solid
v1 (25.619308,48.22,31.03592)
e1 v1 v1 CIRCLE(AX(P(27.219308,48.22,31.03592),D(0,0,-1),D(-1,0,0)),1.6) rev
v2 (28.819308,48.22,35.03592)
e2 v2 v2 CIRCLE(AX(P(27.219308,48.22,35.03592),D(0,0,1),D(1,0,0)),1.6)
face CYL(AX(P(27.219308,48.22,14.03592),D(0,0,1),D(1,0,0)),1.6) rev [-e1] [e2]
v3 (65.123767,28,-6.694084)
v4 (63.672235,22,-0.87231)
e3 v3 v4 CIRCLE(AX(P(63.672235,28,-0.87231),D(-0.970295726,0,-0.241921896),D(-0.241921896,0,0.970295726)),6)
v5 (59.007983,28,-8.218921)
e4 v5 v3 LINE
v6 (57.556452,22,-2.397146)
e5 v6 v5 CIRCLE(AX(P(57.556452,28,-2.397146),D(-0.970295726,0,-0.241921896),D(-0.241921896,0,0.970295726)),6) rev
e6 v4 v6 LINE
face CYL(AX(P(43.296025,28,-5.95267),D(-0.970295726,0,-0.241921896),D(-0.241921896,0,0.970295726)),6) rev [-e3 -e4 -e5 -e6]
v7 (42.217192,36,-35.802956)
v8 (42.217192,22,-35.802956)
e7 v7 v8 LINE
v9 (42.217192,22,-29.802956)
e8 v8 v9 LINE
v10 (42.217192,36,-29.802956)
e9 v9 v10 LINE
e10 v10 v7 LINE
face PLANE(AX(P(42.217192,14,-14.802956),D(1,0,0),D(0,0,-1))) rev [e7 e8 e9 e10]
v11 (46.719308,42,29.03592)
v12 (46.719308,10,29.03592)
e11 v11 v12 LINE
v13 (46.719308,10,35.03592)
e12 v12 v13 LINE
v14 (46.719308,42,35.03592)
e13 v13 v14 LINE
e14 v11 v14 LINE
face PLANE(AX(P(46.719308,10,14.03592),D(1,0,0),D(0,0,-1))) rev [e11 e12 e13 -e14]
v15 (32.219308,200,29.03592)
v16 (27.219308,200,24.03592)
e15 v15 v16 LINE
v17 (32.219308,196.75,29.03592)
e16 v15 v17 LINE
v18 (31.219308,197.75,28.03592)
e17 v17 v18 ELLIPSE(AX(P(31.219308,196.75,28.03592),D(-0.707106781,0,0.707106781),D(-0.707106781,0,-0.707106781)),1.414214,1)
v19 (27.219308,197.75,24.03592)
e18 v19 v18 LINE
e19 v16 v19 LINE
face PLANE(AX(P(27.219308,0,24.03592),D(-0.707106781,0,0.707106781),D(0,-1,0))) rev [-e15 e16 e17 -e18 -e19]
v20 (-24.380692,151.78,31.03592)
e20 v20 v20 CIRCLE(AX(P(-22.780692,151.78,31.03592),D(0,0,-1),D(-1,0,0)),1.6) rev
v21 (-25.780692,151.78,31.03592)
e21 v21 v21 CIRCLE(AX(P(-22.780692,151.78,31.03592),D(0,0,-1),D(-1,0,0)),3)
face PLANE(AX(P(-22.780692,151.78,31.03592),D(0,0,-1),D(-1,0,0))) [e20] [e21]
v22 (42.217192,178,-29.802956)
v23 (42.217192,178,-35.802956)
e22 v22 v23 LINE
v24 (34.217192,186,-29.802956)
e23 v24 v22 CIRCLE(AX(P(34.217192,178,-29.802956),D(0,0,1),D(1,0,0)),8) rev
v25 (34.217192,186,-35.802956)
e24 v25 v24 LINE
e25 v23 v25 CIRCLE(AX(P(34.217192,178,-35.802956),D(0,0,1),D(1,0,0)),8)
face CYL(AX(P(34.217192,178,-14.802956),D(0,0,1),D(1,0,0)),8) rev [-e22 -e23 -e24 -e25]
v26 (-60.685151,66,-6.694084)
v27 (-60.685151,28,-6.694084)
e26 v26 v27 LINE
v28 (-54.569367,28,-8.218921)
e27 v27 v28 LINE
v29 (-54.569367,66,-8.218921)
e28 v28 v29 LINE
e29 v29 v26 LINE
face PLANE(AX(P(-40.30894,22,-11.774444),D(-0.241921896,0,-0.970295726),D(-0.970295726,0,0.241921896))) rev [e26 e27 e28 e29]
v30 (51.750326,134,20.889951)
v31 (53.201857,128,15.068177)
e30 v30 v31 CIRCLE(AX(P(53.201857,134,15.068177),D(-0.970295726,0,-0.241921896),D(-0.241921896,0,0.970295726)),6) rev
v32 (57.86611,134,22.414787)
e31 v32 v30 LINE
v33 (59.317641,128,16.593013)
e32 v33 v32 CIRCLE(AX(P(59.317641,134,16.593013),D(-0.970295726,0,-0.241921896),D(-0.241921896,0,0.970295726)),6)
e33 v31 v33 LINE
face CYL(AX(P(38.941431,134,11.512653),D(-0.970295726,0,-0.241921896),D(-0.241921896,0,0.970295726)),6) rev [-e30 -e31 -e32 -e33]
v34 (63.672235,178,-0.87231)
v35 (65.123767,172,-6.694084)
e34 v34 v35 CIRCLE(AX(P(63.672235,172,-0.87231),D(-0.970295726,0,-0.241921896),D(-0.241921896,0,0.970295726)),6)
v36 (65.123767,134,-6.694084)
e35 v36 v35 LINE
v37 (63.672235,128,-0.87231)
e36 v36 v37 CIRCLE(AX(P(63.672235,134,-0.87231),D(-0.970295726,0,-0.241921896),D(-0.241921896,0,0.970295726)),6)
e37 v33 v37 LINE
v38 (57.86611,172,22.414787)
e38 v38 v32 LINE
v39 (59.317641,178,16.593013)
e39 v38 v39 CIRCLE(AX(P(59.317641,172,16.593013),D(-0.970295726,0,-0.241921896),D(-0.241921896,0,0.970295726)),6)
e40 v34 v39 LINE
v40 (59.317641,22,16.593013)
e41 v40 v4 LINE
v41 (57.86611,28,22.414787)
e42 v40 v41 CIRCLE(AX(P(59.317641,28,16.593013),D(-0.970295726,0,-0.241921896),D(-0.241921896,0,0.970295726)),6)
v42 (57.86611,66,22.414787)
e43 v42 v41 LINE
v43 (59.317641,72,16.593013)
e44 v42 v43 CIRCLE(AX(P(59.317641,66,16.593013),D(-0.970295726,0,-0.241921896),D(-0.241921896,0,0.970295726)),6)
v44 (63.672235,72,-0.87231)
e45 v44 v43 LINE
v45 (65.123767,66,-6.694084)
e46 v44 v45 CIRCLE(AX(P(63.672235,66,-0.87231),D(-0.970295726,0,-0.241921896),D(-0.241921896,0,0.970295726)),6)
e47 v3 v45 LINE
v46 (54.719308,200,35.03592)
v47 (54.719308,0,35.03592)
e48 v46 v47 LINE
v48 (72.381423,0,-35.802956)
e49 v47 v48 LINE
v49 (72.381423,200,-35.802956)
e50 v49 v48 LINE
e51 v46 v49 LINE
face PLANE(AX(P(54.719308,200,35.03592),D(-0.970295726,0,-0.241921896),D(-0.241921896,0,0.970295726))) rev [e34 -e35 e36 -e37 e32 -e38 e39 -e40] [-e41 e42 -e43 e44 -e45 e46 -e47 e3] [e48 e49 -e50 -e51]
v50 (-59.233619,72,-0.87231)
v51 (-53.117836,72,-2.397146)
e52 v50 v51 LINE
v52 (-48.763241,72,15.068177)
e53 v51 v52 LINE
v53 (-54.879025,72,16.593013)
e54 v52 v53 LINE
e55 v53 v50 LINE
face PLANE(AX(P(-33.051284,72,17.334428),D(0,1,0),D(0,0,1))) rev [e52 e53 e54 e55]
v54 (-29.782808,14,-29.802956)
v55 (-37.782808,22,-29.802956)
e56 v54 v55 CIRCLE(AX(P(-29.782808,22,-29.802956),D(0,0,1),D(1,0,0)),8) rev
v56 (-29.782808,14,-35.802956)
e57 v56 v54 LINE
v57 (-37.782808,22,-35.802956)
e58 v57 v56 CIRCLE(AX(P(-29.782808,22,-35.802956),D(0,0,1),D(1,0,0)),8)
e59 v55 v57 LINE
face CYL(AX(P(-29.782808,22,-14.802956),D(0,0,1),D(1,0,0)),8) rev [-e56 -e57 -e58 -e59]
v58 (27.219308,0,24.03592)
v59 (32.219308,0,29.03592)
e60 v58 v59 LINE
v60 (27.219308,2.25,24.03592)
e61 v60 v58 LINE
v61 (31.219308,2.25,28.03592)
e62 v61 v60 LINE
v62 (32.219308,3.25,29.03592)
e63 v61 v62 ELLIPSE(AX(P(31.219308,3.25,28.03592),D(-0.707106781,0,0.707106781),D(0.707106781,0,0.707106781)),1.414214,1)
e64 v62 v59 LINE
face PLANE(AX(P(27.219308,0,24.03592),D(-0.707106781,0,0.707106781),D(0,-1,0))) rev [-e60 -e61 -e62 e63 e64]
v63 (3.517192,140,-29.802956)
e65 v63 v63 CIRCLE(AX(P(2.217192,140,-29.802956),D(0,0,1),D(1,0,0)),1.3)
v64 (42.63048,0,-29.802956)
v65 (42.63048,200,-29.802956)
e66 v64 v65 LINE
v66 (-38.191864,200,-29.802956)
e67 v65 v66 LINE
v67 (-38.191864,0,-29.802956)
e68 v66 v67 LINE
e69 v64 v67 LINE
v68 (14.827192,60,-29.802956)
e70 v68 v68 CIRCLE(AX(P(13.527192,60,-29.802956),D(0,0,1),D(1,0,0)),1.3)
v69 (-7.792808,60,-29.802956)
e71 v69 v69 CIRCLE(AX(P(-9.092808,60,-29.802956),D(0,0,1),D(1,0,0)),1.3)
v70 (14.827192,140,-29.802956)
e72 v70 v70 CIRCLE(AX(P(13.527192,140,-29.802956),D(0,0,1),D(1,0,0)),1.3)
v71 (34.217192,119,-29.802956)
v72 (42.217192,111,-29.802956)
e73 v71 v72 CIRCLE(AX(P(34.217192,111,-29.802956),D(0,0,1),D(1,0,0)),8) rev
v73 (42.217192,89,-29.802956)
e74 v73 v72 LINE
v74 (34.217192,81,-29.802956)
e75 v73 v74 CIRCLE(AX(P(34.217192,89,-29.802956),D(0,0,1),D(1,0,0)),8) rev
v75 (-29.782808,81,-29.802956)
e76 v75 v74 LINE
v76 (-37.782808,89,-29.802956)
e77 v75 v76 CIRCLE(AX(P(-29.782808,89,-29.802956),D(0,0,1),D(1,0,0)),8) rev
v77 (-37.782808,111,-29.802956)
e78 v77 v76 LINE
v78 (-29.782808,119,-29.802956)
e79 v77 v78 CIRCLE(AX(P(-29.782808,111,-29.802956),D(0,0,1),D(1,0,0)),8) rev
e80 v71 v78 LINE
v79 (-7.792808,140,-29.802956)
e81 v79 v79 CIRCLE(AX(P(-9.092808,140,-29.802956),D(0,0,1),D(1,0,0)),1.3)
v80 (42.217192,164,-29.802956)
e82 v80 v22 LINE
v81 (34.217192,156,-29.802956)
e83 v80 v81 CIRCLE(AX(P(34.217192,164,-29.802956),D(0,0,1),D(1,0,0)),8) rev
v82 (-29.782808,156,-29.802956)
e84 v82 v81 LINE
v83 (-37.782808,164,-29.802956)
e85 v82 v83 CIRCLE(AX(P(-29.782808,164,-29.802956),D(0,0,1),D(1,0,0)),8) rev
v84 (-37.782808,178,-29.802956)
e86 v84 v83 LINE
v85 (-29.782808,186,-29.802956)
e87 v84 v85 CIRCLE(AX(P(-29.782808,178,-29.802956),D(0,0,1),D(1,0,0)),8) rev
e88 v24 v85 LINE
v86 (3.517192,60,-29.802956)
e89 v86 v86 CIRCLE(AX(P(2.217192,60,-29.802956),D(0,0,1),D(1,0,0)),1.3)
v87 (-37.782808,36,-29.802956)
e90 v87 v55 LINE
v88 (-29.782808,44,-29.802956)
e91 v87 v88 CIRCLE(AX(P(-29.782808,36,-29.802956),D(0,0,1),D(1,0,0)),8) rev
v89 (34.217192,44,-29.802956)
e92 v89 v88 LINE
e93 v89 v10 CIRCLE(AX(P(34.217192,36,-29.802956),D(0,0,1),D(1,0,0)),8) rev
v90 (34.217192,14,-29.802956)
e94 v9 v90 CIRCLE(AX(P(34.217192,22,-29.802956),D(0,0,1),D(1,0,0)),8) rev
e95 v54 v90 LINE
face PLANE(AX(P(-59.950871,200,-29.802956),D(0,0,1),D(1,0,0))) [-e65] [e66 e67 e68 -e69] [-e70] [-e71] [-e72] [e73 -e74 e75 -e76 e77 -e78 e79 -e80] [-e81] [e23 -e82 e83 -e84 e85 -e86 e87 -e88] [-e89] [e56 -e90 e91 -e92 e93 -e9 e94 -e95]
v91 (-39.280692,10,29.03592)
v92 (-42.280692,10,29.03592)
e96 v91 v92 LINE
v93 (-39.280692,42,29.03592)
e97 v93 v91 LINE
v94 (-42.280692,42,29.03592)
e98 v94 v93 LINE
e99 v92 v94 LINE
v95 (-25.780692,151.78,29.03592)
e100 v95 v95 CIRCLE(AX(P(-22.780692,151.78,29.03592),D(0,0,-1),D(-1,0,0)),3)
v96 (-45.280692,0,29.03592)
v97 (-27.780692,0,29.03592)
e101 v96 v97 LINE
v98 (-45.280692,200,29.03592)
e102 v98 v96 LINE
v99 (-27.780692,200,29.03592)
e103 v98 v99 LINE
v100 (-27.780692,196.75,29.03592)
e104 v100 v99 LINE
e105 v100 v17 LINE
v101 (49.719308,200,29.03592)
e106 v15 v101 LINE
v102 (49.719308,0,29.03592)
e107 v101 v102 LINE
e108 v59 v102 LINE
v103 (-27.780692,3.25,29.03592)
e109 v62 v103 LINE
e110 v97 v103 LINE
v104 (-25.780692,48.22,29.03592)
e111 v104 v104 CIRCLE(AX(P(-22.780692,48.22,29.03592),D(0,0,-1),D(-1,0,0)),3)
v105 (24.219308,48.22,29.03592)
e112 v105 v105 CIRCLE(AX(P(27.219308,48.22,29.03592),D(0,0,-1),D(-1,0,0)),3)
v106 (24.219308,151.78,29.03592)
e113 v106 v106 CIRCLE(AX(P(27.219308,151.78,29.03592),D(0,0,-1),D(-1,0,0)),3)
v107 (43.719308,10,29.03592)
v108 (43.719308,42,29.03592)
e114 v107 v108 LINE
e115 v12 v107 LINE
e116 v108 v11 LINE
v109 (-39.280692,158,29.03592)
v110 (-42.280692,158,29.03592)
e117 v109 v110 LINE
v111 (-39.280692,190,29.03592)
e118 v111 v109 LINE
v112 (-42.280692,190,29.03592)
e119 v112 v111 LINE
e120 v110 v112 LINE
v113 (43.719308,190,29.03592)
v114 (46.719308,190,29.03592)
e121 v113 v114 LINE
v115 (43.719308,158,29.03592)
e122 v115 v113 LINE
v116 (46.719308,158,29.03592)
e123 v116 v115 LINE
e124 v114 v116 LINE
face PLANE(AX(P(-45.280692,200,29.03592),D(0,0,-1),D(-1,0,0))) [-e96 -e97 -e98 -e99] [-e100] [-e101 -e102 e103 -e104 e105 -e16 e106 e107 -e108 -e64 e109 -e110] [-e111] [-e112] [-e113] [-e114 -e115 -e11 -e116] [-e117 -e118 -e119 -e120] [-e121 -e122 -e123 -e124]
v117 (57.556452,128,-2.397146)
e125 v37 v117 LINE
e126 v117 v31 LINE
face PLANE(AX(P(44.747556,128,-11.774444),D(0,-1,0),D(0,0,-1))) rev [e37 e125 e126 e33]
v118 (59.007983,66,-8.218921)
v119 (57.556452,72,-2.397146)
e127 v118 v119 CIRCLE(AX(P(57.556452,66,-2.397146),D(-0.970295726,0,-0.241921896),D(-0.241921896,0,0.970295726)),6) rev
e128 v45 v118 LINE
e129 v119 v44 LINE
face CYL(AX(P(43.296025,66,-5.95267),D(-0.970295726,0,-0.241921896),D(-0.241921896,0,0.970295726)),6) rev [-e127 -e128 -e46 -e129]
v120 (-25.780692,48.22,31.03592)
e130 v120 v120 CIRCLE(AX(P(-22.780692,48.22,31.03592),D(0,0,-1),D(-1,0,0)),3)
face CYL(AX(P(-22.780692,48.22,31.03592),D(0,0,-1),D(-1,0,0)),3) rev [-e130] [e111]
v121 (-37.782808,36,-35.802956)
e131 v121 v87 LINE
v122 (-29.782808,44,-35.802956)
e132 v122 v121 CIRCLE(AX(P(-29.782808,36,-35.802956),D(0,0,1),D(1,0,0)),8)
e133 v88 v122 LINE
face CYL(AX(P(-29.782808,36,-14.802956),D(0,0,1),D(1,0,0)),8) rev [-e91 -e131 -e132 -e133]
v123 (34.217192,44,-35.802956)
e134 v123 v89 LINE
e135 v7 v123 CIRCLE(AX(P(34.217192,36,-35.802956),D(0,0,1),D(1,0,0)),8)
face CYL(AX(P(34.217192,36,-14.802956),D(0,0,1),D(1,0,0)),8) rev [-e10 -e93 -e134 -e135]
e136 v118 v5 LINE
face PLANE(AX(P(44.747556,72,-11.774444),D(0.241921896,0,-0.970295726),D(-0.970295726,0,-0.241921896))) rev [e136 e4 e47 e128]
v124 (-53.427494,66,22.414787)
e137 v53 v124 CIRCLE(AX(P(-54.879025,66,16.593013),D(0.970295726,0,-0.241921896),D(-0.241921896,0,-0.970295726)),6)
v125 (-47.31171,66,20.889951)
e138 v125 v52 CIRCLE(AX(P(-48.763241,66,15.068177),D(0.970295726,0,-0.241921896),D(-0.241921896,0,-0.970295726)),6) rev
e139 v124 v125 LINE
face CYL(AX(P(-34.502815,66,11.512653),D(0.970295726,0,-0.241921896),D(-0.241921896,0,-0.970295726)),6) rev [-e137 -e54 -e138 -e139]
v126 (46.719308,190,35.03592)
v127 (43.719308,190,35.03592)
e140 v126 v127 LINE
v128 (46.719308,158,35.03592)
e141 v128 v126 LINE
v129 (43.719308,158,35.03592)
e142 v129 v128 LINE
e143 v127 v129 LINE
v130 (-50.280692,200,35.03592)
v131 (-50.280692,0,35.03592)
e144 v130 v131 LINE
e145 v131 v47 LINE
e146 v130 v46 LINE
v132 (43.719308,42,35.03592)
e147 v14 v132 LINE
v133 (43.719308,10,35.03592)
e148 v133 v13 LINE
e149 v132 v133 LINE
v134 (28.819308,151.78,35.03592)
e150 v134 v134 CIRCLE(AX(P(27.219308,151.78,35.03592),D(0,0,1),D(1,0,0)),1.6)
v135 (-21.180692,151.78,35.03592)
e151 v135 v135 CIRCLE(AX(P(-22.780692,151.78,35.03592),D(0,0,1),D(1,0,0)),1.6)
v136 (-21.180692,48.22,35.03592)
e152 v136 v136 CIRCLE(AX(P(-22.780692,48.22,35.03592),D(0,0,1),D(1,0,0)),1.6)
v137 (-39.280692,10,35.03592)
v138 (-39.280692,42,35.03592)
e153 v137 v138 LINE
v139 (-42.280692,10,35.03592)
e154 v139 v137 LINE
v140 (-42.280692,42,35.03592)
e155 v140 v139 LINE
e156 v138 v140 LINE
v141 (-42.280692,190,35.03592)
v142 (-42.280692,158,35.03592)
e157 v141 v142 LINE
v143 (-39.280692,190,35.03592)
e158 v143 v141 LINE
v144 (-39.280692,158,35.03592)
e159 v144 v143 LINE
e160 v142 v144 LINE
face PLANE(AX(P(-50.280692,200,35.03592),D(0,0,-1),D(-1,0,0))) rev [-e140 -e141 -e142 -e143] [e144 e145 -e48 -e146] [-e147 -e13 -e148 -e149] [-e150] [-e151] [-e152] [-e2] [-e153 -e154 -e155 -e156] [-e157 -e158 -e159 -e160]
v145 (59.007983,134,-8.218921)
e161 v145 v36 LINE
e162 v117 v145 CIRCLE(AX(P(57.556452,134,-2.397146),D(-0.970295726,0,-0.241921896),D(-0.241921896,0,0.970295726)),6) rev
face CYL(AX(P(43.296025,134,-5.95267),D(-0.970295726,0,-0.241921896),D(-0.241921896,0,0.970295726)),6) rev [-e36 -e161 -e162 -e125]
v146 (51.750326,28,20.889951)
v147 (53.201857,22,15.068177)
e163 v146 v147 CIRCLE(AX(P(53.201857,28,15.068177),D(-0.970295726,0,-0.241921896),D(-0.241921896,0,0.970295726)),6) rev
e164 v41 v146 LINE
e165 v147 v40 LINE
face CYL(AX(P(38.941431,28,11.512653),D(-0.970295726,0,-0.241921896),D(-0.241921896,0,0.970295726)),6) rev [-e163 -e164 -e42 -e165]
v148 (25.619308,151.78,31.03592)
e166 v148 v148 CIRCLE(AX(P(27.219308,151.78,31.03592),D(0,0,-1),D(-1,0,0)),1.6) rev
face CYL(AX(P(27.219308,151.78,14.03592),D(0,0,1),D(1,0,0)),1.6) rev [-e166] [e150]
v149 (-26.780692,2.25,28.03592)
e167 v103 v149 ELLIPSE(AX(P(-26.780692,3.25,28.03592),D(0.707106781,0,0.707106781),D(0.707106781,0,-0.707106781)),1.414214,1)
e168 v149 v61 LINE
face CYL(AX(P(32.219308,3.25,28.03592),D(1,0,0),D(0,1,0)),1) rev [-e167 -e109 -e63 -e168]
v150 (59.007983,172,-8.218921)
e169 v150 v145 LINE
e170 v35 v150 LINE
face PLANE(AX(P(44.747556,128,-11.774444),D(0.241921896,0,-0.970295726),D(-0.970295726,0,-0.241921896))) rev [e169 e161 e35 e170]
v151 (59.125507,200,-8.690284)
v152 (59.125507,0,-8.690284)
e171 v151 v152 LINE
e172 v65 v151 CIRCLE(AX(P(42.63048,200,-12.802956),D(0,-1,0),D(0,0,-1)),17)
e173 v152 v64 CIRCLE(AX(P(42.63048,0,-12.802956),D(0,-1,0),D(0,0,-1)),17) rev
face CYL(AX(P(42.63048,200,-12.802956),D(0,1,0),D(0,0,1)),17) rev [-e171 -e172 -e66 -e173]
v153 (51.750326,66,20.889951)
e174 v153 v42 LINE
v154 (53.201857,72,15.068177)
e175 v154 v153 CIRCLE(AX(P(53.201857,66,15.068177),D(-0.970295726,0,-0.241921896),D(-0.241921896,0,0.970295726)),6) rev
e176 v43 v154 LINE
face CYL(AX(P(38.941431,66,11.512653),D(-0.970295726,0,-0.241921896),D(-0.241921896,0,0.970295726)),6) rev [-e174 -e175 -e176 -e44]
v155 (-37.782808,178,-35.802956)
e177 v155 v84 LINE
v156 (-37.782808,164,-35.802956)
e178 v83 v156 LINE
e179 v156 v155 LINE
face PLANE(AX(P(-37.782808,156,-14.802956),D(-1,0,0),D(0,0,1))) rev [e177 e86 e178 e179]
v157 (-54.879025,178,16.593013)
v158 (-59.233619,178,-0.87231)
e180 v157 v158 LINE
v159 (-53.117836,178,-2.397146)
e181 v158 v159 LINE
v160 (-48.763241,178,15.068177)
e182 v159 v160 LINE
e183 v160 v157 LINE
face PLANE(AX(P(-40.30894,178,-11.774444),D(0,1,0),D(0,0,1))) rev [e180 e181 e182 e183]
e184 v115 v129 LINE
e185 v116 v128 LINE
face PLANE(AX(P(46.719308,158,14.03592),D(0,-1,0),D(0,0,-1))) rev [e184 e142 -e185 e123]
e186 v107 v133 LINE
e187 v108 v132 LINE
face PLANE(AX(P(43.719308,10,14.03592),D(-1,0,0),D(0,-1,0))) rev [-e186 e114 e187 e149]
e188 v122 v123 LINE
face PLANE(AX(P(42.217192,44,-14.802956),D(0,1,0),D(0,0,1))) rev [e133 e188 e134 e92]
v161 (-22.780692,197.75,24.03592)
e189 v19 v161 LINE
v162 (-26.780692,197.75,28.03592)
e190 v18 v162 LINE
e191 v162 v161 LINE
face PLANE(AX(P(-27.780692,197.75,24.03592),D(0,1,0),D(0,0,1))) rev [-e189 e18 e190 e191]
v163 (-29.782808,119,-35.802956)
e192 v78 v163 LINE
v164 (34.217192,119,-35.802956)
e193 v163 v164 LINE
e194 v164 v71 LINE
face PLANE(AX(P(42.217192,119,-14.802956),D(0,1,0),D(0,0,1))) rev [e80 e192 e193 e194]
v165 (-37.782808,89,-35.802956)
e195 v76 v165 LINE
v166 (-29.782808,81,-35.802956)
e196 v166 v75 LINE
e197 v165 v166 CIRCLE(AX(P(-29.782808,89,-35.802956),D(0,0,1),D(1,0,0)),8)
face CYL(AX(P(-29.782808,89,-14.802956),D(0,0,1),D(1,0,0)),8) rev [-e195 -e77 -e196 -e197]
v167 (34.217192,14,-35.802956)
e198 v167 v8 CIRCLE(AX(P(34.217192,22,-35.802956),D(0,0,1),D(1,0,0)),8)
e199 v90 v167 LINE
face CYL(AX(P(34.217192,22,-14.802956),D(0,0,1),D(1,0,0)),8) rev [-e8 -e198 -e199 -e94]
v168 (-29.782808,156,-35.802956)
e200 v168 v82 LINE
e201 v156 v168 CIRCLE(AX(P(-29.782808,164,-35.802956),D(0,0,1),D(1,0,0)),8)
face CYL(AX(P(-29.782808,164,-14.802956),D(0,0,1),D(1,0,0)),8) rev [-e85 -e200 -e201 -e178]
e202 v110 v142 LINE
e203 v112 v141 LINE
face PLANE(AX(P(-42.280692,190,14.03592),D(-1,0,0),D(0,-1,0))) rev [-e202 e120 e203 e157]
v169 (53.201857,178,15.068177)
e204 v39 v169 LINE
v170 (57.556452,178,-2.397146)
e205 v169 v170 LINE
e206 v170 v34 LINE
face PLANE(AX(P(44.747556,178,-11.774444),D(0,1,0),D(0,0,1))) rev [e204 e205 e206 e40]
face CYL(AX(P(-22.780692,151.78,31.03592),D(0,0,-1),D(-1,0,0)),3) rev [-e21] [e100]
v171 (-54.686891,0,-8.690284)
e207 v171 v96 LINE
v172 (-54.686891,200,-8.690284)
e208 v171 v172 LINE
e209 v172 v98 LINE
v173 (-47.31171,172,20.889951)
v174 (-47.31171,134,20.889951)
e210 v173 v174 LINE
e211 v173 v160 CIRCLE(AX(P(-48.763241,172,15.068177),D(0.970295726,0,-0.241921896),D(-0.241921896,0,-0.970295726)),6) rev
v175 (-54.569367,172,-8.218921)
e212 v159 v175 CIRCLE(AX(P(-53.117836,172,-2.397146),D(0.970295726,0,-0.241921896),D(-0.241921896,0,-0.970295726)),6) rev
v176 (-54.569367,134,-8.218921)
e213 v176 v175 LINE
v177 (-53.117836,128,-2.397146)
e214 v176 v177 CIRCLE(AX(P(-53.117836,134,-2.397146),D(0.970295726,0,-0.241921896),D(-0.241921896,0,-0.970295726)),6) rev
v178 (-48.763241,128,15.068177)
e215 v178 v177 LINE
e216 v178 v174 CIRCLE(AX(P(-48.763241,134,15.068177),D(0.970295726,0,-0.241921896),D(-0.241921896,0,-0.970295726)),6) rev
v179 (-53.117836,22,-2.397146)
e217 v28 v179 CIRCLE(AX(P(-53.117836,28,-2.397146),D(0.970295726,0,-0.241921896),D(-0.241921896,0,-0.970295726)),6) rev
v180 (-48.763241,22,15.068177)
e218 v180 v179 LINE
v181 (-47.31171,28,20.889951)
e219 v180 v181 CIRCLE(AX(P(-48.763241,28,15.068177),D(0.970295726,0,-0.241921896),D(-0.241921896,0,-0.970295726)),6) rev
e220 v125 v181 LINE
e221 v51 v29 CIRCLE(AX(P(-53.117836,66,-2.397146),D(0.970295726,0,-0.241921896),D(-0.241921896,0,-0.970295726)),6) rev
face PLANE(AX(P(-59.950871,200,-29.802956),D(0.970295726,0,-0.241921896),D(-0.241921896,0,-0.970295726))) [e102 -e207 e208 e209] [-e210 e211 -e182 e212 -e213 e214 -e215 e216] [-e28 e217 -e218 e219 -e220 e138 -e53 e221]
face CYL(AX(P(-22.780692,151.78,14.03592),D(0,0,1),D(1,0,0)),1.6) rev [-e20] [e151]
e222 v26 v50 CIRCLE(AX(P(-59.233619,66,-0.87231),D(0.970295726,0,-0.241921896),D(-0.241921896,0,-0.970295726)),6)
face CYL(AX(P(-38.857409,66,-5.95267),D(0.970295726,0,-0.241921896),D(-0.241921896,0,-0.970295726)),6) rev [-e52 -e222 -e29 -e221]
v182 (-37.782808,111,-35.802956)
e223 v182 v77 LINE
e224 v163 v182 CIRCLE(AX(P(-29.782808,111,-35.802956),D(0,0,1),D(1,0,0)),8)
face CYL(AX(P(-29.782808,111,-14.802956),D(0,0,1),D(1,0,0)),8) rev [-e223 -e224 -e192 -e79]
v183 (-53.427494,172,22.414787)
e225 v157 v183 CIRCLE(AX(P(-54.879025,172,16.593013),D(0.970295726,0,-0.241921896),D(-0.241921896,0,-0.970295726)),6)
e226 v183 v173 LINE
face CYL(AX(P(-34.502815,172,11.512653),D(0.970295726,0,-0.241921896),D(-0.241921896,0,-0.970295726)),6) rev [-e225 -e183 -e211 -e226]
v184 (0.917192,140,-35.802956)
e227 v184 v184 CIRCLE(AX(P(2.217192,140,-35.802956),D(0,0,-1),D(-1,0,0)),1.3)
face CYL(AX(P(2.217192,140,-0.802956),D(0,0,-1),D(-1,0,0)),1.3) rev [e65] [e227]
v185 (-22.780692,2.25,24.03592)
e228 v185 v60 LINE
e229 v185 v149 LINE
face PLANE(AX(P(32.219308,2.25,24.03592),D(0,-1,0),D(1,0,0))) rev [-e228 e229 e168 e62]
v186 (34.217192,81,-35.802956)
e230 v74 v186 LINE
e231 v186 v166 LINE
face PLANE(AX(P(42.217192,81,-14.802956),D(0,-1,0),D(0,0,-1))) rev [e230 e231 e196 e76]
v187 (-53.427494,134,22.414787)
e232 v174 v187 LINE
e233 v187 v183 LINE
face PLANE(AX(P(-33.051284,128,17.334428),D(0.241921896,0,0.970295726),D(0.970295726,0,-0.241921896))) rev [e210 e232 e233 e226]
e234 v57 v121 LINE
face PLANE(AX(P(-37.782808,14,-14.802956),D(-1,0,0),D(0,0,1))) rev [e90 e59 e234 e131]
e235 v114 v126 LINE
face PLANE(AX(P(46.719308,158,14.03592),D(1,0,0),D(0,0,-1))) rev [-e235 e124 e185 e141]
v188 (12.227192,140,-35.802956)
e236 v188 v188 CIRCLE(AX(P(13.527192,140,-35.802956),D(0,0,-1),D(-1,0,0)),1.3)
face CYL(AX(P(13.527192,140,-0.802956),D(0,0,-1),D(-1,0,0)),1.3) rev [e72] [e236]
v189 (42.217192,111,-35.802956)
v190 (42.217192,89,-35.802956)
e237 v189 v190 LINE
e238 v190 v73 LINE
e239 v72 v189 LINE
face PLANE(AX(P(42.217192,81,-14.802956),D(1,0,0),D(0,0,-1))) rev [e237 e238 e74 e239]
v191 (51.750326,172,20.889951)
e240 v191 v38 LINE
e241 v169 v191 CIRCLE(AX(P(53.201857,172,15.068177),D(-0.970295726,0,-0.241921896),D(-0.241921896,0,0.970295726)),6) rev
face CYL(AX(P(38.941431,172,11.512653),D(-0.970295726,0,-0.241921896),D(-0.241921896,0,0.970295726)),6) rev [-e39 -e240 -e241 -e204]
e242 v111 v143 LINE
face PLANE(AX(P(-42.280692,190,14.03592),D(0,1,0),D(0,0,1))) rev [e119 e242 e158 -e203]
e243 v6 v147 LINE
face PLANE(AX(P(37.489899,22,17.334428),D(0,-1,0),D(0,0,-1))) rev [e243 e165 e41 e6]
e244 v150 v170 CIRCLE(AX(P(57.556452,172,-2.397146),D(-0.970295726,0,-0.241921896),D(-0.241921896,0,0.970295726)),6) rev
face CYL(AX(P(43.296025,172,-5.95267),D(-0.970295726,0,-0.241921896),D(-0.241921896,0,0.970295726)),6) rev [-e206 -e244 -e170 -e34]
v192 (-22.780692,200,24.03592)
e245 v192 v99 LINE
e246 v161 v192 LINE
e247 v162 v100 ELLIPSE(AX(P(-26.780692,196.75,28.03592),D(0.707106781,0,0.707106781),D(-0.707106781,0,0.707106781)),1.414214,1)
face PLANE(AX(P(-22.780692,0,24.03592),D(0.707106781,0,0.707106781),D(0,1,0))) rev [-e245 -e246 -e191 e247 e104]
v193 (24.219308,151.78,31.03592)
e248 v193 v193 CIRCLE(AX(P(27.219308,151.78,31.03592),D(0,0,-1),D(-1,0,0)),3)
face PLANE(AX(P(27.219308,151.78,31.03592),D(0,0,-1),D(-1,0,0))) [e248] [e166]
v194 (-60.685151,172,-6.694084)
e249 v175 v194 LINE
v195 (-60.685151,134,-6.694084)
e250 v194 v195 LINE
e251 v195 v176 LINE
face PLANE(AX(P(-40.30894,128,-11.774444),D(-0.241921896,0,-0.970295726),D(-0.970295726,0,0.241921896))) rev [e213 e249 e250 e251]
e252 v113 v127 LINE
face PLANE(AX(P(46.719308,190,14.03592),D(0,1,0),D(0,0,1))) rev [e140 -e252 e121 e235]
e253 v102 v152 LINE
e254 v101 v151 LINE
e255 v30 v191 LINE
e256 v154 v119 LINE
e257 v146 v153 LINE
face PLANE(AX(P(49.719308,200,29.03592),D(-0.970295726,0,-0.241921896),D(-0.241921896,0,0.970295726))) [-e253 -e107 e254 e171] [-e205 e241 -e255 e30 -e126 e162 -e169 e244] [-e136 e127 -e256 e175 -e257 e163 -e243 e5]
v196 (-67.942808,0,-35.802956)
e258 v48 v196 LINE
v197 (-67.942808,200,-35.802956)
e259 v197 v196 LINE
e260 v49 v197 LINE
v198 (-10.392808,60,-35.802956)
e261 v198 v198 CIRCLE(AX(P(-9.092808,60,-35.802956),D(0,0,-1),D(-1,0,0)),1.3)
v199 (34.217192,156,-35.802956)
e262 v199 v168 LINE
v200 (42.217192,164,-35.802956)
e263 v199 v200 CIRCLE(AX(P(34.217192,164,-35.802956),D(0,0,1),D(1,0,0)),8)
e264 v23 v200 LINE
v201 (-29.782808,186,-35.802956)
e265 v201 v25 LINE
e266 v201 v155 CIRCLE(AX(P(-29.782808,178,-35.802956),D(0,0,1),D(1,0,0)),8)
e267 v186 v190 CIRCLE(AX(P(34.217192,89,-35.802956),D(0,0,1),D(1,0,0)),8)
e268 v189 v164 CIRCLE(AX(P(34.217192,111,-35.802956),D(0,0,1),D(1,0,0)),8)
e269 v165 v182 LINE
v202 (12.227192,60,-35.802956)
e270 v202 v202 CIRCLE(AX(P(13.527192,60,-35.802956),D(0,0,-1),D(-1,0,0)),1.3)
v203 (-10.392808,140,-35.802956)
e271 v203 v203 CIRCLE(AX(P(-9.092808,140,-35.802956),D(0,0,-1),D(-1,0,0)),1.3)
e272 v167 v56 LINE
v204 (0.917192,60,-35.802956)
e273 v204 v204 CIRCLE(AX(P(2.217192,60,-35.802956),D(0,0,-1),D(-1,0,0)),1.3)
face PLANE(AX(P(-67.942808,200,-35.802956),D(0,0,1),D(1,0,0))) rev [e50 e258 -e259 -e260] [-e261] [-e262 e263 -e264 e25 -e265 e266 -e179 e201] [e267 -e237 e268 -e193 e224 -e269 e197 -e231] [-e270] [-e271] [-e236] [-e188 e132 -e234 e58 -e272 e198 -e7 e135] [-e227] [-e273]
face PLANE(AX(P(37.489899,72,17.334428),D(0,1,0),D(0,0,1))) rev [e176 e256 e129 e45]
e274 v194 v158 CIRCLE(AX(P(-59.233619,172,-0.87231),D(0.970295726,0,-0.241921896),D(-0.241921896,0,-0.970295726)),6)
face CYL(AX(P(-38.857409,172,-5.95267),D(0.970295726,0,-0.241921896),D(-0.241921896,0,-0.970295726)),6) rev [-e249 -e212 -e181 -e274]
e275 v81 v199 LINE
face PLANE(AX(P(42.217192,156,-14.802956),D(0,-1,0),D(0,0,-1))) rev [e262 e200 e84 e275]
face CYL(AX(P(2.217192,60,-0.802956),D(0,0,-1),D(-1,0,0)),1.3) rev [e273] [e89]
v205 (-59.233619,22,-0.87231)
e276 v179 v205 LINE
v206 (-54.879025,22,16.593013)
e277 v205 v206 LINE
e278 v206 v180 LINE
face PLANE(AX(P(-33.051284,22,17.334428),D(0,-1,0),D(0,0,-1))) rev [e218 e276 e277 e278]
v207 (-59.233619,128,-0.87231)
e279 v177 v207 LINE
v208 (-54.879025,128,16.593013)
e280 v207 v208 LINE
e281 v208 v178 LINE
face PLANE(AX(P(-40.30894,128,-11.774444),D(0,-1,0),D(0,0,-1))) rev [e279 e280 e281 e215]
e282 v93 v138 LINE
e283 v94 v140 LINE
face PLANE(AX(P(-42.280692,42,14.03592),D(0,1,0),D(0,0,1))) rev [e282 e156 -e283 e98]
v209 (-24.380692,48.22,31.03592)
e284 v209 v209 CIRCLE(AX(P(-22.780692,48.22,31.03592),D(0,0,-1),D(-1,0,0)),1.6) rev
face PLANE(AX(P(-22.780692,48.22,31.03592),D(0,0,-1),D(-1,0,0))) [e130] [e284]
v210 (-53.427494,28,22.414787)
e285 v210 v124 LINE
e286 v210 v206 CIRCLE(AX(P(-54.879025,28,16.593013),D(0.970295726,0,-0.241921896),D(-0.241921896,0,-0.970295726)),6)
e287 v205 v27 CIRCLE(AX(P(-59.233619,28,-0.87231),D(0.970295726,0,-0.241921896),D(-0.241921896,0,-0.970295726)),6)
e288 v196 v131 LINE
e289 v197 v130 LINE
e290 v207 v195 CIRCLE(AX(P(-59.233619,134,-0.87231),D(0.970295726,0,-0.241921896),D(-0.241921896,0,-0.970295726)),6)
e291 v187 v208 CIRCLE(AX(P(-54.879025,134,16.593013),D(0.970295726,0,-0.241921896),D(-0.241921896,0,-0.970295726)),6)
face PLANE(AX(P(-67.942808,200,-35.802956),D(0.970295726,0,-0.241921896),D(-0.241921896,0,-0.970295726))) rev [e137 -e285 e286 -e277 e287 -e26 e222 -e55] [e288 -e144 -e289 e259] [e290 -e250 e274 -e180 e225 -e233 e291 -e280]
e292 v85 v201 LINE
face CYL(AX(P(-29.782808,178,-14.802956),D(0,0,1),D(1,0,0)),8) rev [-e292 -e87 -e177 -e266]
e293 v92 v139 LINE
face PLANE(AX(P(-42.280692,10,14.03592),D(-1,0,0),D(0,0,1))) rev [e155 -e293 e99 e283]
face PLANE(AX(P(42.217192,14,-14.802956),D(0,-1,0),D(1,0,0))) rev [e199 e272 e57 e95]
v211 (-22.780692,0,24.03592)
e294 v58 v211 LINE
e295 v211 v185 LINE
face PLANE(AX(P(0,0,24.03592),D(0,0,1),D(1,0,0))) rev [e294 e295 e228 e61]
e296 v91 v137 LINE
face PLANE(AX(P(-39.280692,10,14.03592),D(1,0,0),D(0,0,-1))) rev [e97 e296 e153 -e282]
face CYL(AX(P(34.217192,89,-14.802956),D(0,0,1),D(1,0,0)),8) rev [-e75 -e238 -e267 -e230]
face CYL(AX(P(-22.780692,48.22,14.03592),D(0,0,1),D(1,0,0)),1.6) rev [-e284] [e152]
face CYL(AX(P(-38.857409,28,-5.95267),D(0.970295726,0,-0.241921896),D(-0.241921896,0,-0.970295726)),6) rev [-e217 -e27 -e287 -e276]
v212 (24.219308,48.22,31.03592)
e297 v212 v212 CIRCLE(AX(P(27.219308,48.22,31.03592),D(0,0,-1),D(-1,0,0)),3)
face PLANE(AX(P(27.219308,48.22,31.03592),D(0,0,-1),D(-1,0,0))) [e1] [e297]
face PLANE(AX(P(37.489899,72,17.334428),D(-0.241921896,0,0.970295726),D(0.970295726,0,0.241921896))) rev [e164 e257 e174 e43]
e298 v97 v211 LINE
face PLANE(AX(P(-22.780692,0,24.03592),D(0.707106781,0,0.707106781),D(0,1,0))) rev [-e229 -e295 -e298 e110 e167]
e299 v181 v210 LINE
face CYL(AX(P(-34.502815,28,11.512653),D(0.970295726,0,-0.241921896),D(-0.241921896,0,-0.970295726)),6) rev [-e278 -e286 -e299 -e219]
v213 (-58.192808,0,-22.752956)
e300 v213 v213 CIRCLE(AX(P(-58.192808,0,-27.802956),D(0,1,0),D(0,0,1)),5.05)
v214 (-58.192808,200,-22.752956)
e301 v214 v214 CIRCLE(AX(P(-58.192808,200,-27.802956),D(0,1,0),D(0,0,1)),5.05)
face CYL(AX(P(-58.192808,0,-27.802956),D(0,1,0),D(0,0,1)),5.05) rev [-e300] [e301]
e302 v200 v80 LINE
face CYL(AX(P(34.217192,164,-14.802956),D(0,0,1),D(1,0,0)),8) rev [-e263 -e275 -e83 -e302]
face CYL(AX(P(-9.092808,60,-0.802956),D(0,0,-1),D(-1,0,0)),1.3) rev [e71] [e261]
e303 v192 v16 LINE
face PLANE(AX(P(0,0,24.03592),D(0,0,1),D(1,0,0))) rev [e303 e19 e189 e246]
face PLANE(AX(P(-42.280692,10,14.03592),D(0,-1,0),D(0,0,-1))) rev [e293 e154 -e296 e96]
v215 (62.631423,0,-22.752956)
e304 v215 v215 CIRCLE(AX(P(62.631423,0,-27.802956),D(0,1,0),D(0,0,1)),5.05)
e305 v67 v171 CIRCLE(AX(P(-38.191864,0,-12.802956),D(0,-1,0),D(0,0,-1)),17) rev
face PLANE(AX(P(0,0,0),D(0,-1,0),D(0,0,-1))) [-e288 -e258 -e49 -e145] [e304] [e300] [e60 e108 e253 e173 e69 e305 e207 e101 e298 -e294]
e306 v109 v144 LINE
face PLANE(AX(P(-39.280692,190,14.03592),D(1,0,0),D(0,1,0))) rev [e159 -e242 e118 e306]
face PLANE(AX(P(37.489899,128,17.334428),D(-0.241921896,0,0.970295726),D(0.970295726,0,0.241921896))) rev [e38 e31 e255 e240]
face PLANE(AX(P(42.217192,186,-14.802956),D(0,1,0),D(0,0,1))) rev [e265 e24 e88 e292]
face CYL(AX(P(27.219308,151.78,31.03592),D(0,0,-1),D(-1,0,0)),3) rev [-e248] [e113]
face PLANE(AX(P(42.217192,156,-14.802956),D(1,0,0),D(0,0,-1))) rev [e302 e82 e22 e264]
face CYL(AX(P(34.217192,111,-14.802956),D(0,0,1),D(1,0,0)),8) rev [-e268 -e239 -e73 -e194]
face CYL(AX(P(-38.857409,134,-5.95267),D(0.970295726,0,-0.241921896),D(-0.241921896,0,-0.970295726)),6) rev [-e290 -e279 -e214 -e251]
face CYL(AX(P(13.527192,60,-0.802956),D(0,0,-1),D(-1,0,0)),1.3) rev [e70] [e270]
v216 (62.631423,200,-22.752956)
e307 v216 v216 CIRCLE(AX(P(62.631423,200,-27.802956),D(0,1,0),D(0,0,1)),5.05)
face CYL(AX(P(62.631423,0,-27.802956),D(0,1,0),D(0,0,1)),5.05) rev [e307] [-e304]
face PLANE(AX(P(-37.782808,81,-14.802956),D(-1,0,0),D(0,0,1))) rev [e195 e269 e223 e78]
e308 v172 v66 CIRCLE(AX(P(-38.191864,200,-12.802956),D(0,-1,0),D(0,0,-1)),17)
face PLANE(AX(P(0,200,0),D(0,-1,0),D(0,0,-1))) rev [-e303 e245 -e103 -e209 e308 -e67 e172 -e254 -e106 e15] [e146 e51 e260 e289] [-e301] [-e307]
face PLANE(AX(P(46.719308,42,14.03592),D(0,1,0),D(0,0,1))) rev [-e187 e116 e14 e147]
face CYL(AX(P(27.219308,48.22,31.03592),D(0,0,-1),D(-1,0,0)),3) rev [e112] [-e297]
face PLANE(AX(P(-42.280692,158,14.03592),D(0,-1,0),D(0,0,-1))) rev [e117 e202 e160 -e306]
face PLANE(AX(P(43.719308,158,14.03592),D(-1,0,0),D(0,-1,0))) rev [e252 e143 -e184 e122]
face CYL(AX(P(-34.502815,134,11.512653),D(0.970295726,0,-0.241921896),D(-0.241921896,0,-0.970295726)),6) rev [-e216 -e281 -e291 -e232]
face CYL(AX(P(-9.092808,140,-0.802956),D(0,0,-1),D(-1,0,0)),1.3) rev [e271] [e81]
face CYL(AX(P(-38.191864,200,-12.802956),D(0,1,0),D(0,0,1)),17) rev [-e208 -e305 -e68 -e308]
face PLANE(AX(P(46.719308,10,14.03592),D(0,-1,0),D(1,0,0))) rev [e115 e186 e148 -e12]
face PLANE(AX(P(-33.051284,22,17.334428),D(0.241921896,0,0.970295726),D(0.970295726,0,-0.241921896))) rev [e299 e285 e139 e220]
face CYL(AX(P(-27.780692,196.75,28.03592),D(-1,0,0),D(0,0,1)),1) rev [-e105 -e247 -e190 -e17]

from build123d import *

# Parameters (mm, degrees)
BOSS_EXTRUDE2_DEPTH = 200
FILLET2_R           = 17
SKETCH3_R           = 5.05
CUT_EXTRUDE1_DEPTH  = 200
SKETCH4_R           = 1.3
CUT_EXTRUDE3_DEPTH  = 35
SKETCH5_W           = 80
SKETCH5_H           = 38
SKETCH5_H_2         = 30
CUT_EXTRUDE4_DEPTH  = 21
FILLET3_R           = 8
SKETCH6_W           = 3
SKETCH6_H           = 32
CUT_EXTRUDE5_DEPTH  = 21
SKETCH8_W           = 30
SKETCH8_H           = 50
CUT_EXTRUDE6_DEPTH  = 21
FILLET4_R           = 6
SKETCH9_W           = 30
SKETCH9_H           = 50
CUT_EXTRUDE7_DEPTH  = 21
FILLET5_R           = 6
SKETCH10_W          = 60
SKETCH10_H          = 2.25
BOSS_EXTRUDE3_DEPTH = 5
CHAMFER1_SIZE       = 5
CHAMFER2_SIZE       = 5
FILLET6_R           = 1
SKETCH11_W          = 60
SKETCH11_H          = 2.25
BOSS_EXTRUDE4_DEPTH = 5
CHAMFER3_SIZE       = 5
FILLET7_R           = 1
SKETCH12_R          = 1.6
CUT_EXTRUDE9_DEPTH  = 21
SKETCH13_R          = 3
CUT_EXTRUDE10_DEPTH = 2


with BuildPart() as part:
    # Sketch1 → Boss-Extrude2 (new body)
    with BuildSketch(Plane(origin=(0, 0, 0), x_dir=(1, 0, 0), z_dir=(0, 1, 0))):
        Polygon((-67.942807508, 35.802956243), (72.381423465, 35.802956243), (54.719307979, -35.035919795), (-50.280692021, -35.035919795), align=None)
        Polygon((-45.280692021, -29.035919795), (49.719307979, -29.035919795), (64.389487431, 29.802956243), (-59.950871474, 29.802956243), align=None, mode=Mode.SUBTRACT)
    extrude(amount=BOSS_EXTRUDE2_DEPTH)

    # Fillet2
    fillet2_edges = [part.edges().sort_by_distance(p)[0] for p in [
        (64.389487431, 100, -29.802956243),
        (-59.950871474, 100, -29.802956243),
    ]]
    fillet(fillet2_edges, radius=FILLET2_R)

    # Sketch3 → Cut-Extrude1 (cut)
    with BuildSketch(Plane(origin=(0, 200, 0), x_dir=(1, 0, 0), z_dir=(0, 1, 0))):
        with Locations(Location((-58.192807508, 27.802956243, 0), (0, 0, 270))):
            Circle(SKETCH3_R)
        with Locations(Location((62.631423465, 27.802956243, 0), (0, 0, 270))):
            Circle(SKETCH3_R)
    extrude(amount=-CUT_EXTRUDE1_DEPTH, mode=Mode.SUBTRACT)

    # Sketch4 → Cut-Extrude3 (cut)
    with BuildSketch(Plane(origin=(0, 0, -35.802956243), x_dir=(-1, 0, 0), z_dir=(0, 0, -1))):
        with Locations((9.092807508, 60)):
            Circle(SKETCH4_R)
        with Locations((-13.527192492, 60)):
            Circle(SKETCH4_R)
        with Locations((9.092807508, 140)):
            Circle(SKETCH4_R)
        with Locations((-2.217192492, 140)):
            Circle(SKETCH4_R)
        with Locations((-13.527192492, 140)):
            Circle(SKETCH4_R)
        with Locations((-2.217192492, 60)):
            Circle(SKETCH4_R)
    extrude(amount=-CUT_EXTRUDE3_DEPTH, mode=Mode.SUBTRACT)

    # Sketch5 → Cut-Extrude4 (cut)
    with BuildSketch(Plane(origin=(0, 0, -35.802956243), x_dir=(-1, 0, 0), z_dir=(0, 0, -1))):
        with Locations((-2.217192492, 100)):
            Rectangle(SKETCH5_W, SKETCH5_H)
        with Locations((-2.217192492, 171)):
            Rectangle(SKETCH5_W, SKETCH5_H_2)
        with Locations((-2.217192492, 29)):
            Rectangle(SKETCH5_W, SKETCH5_H_2)
    extrude(amount=-CUT_EXTRUDE4_DEPTH, mode=Mode.SUBTRACT)

    # Fillet3
    fillet3_edges = [part.edges().sort_by_distance(p)[0] for p in [
        (-37.782807508, 186, -32.802956243),
        (-37.782807508, 156, -32.802956243),
        (42.217192492, 156, -32.802956243),
        (42.217192492, 186, -32.802956243),
        (-37.782807508, 119, -32.802956243),
        (-37.782807508, 81, -32.802956243),
        (42.217192492, 81, -32.802956243),
        (42.217192492, 119, -32.802956243),
        (-37.782807508, 44, -32.802956243),
        (-37.782807508, 14, -32.802956243),
        (42.217192492, 14, -32.802956243),
        (42.217192492, 44, -32.802956243),
    ]]
    fillet(fillet3_edges, radius=FILLET3_R)

    # Sketch6 → Cut-Extrude5 (cut)
    with BuildSketch(Plane.XY.offset(35.035919795)):
        with Locations((-40.780692021, 174)):
            Rectangle(SKETCH6_W, SKETCH6_H)
        with Locations((-40.780692021, 26)):
            Rectangle(SKETCH6_W, SKETCH6_H)
        with Locations((45.219307979, 26)):
            Rectangle(SKETCH6_W, SKETCH6_H)
        with Locations((45.219307979, 174)):
            Rectangle(SKETCH6_W, SKETCH6_H)
    extrude(amount=-CUT_EXTRUDE5_DEPTH, mode=Mode.SUBTRACT)

    # Sketch8 → Cut-Extrude6 (cut)
    with BuildSketch(Plane(origin=(59.740978631, 0, 14.89509889), x_dir=(0.24192189559966498, 0, -0.9702957262759973), z_dir=(0.9702957262759971, 0, 0.24192189559966495))):
        with Locations((7.250106602, 47)):
            Rectangle(SKETCH8_W, SKETCH8_H)
        with Locations((7.250106602, 153)):
            Rectangle(SKETCH8_W, SKETCH8_H)
    extrude(amount=-CUT_EXTRUDE6_DEPTH, mode=Mode.SUBTRACT)

    # Fillet4
    fillet4_edges = [part.edges().sort_by_distance(p)[0] for p in [
        (62.065874762, 72, -7.456502519),
        (62.065874762, 22, -7.456502519),
        (54.808217894, 22, 21.652369269),
        (54.808217894, 72, 21.652369269),
        (62.065874762, 178, -7.456502519),
        (62.065874762, 128, -7.456502519),
        (54.808217894, 128, 21.652369269),
        (54.808217894, 178, 21.652369269),
    ]]
    fillet(fillet4_edges, radius=FILLET4_R)

    # Sketch9 → Cut-Extrude7 (cut)
    with BuildSketch(Plane(origin=(-55.562138014, 0, 13.853196905), x_dir=(0.2419218955996648, 0, 0.9702957262759973), z_dir=(-0.9702957262759973, 0, 0.2419218955996648))):
        with Locations((-6.176308215, 47)):
            Rectangle(SKETCH9_W, SKETCH9_H)
        with Locations((-6.176308215, 153)):
            Rectangle(SKETCH9_W, SKETCH9_H)
    extrude(amount=-CUT_EXTRUDE7_DEPTH, mode=Mode.SUBTRACT)

    # Fillet5
    fillet5_edges = [part.edges().sort_by_distance(p)[0] for p in [
        (-50.369601937, 72, 21.652369269),
        (-50.369601937, 22, 21.652369269),
        (-57.627258805, 22, -7.456502519),
        (-57.627258805, 72, -7.456502519),
        (-57.627258805, 128, -7.456502519),
        (-57.627258805, 178, -7.456502519),
        (-50.369601937, 178, 21.652369269),
        (-50.369601937, 128, 21.652369269),
    ]]
    fillet(fillet5_edges, radius=FILLET5_R)

    # Sketch10 → Boss-Extrude3 (add)
    with BuildSketch(Plane(origin=(0, 0, 29.035919795), x_dir=(-1, 0, 0), z_dir=(0, 0, -1))):
        with Locations((-2.219307979, 1.125)):
            Rectangle(SKETCH10_W, SKETCH10_H)
    extrude(amount=BOSS_EXTRUDE3_DEPTH)

    # Chamfer1
    chamfer1_edges = [part.edges().sort_by_distance(p)[0] for p in [
        (32.219307979, 1.125, 24.035919795),
    ]]
    chamfer(chamfer1_edges, length=CHAMFER1_SIZE - 0.0001)  # a hair under: the kernel refuses the full size

    # Chamfer2
    chamfer2_edges = [part.edges().sort_by_distance(p)[0] for p in [
        (-27.780692021, 1.125, 24.035919795),
    ]]
    chamfer(chamfer2_edges, length=CHAMFER2_SIZE - 0.0001)  # a hair under: the kernel refuses the full size

    # Fillet6
    fillet6_edges = [part.edges().sort_by_distance(p)[0] for p in [
        (2.219307979, 2.25, 29.035919795),
    ]]
    fillet(fillet6_edges, radius=FILLET6_R)

    # Sketch11 → Boss-Extrude4 (add)
    with BuildSketch(Plane(origin=(0, 0, 29.035919795), x_dir=(-1, 0, 0), z_dir=(0, 0, -1))):
        with Locations((-2.219307979, 198.875)):
            Rectangle(SKETCH11_W, SKETCH11_H)
    extrude(amount=BOSS_EXTRUDE4_DEPTH)

    # Chamfer3
    chamfer3_edges = [part.edges().sort_by_distance(p)[0] for p in [
        (32.219307979, 198.875, 24.035919795),
        (-27.780692021, 198.875, 24.035919795),
    ]]
    chamfer(chamfer3_edges, length=CHAMFER3_SIZE - 0.0001)  # a hair under: the kernel refuses the full size

    # Fillet7
    fillet7_edges = [part.edges().sort_by_distance(p)[0] for p in [
        (2.219307979, 197.75, 29.035919795),
    ]]
    fillet(fillet7_edges, radius=FILLET7_R)

    # Sketch12 → Cut-Extrude9 (cut)
    with BuildSketch(Plane.XY.offset(35.035919795)):
        with Locations((27.219307979, 48.22)):
            Circle(SKETCH12_R)
        with Locations((-22.780692021, 48.22)):
            Circle(SKETCH12_R)
        with Locations((27.219307979, 151.78)):
            Circle(SKETCH12_R)
        with Locations((-22.780692021, 151.78)):
            Circle(SKETCH12_R)
    extrude(amount=-CUT_EXTRUDE9_DEPTH, mode=Mode.SUBTRACT)

    # Sketch13 → Cut-Extrude10 (cut)
    with BuildSketch(Plane(origin=(0, 0, 29.035919795), x_dir=(-1, 0, 0), z_dir=(0, 0, -1))):
        with Locations((-27.219307979, 48.22)):
            Circle(SKETCH13_R)
        with Locations((22.780692021, 48.22)):
            Circle(SKETCH13_R)
        with Locations((-27.219307979, 151.78)):
            Circle(SKETCH13_R)
        with Locations((22.780692021, 151.78)):
            Circle(SKETCH13_R)
    extrude(amount=-CUT_EXTRUDE10_DEPTH, mode=Mode.SUBTRACT)


solid = part.part
